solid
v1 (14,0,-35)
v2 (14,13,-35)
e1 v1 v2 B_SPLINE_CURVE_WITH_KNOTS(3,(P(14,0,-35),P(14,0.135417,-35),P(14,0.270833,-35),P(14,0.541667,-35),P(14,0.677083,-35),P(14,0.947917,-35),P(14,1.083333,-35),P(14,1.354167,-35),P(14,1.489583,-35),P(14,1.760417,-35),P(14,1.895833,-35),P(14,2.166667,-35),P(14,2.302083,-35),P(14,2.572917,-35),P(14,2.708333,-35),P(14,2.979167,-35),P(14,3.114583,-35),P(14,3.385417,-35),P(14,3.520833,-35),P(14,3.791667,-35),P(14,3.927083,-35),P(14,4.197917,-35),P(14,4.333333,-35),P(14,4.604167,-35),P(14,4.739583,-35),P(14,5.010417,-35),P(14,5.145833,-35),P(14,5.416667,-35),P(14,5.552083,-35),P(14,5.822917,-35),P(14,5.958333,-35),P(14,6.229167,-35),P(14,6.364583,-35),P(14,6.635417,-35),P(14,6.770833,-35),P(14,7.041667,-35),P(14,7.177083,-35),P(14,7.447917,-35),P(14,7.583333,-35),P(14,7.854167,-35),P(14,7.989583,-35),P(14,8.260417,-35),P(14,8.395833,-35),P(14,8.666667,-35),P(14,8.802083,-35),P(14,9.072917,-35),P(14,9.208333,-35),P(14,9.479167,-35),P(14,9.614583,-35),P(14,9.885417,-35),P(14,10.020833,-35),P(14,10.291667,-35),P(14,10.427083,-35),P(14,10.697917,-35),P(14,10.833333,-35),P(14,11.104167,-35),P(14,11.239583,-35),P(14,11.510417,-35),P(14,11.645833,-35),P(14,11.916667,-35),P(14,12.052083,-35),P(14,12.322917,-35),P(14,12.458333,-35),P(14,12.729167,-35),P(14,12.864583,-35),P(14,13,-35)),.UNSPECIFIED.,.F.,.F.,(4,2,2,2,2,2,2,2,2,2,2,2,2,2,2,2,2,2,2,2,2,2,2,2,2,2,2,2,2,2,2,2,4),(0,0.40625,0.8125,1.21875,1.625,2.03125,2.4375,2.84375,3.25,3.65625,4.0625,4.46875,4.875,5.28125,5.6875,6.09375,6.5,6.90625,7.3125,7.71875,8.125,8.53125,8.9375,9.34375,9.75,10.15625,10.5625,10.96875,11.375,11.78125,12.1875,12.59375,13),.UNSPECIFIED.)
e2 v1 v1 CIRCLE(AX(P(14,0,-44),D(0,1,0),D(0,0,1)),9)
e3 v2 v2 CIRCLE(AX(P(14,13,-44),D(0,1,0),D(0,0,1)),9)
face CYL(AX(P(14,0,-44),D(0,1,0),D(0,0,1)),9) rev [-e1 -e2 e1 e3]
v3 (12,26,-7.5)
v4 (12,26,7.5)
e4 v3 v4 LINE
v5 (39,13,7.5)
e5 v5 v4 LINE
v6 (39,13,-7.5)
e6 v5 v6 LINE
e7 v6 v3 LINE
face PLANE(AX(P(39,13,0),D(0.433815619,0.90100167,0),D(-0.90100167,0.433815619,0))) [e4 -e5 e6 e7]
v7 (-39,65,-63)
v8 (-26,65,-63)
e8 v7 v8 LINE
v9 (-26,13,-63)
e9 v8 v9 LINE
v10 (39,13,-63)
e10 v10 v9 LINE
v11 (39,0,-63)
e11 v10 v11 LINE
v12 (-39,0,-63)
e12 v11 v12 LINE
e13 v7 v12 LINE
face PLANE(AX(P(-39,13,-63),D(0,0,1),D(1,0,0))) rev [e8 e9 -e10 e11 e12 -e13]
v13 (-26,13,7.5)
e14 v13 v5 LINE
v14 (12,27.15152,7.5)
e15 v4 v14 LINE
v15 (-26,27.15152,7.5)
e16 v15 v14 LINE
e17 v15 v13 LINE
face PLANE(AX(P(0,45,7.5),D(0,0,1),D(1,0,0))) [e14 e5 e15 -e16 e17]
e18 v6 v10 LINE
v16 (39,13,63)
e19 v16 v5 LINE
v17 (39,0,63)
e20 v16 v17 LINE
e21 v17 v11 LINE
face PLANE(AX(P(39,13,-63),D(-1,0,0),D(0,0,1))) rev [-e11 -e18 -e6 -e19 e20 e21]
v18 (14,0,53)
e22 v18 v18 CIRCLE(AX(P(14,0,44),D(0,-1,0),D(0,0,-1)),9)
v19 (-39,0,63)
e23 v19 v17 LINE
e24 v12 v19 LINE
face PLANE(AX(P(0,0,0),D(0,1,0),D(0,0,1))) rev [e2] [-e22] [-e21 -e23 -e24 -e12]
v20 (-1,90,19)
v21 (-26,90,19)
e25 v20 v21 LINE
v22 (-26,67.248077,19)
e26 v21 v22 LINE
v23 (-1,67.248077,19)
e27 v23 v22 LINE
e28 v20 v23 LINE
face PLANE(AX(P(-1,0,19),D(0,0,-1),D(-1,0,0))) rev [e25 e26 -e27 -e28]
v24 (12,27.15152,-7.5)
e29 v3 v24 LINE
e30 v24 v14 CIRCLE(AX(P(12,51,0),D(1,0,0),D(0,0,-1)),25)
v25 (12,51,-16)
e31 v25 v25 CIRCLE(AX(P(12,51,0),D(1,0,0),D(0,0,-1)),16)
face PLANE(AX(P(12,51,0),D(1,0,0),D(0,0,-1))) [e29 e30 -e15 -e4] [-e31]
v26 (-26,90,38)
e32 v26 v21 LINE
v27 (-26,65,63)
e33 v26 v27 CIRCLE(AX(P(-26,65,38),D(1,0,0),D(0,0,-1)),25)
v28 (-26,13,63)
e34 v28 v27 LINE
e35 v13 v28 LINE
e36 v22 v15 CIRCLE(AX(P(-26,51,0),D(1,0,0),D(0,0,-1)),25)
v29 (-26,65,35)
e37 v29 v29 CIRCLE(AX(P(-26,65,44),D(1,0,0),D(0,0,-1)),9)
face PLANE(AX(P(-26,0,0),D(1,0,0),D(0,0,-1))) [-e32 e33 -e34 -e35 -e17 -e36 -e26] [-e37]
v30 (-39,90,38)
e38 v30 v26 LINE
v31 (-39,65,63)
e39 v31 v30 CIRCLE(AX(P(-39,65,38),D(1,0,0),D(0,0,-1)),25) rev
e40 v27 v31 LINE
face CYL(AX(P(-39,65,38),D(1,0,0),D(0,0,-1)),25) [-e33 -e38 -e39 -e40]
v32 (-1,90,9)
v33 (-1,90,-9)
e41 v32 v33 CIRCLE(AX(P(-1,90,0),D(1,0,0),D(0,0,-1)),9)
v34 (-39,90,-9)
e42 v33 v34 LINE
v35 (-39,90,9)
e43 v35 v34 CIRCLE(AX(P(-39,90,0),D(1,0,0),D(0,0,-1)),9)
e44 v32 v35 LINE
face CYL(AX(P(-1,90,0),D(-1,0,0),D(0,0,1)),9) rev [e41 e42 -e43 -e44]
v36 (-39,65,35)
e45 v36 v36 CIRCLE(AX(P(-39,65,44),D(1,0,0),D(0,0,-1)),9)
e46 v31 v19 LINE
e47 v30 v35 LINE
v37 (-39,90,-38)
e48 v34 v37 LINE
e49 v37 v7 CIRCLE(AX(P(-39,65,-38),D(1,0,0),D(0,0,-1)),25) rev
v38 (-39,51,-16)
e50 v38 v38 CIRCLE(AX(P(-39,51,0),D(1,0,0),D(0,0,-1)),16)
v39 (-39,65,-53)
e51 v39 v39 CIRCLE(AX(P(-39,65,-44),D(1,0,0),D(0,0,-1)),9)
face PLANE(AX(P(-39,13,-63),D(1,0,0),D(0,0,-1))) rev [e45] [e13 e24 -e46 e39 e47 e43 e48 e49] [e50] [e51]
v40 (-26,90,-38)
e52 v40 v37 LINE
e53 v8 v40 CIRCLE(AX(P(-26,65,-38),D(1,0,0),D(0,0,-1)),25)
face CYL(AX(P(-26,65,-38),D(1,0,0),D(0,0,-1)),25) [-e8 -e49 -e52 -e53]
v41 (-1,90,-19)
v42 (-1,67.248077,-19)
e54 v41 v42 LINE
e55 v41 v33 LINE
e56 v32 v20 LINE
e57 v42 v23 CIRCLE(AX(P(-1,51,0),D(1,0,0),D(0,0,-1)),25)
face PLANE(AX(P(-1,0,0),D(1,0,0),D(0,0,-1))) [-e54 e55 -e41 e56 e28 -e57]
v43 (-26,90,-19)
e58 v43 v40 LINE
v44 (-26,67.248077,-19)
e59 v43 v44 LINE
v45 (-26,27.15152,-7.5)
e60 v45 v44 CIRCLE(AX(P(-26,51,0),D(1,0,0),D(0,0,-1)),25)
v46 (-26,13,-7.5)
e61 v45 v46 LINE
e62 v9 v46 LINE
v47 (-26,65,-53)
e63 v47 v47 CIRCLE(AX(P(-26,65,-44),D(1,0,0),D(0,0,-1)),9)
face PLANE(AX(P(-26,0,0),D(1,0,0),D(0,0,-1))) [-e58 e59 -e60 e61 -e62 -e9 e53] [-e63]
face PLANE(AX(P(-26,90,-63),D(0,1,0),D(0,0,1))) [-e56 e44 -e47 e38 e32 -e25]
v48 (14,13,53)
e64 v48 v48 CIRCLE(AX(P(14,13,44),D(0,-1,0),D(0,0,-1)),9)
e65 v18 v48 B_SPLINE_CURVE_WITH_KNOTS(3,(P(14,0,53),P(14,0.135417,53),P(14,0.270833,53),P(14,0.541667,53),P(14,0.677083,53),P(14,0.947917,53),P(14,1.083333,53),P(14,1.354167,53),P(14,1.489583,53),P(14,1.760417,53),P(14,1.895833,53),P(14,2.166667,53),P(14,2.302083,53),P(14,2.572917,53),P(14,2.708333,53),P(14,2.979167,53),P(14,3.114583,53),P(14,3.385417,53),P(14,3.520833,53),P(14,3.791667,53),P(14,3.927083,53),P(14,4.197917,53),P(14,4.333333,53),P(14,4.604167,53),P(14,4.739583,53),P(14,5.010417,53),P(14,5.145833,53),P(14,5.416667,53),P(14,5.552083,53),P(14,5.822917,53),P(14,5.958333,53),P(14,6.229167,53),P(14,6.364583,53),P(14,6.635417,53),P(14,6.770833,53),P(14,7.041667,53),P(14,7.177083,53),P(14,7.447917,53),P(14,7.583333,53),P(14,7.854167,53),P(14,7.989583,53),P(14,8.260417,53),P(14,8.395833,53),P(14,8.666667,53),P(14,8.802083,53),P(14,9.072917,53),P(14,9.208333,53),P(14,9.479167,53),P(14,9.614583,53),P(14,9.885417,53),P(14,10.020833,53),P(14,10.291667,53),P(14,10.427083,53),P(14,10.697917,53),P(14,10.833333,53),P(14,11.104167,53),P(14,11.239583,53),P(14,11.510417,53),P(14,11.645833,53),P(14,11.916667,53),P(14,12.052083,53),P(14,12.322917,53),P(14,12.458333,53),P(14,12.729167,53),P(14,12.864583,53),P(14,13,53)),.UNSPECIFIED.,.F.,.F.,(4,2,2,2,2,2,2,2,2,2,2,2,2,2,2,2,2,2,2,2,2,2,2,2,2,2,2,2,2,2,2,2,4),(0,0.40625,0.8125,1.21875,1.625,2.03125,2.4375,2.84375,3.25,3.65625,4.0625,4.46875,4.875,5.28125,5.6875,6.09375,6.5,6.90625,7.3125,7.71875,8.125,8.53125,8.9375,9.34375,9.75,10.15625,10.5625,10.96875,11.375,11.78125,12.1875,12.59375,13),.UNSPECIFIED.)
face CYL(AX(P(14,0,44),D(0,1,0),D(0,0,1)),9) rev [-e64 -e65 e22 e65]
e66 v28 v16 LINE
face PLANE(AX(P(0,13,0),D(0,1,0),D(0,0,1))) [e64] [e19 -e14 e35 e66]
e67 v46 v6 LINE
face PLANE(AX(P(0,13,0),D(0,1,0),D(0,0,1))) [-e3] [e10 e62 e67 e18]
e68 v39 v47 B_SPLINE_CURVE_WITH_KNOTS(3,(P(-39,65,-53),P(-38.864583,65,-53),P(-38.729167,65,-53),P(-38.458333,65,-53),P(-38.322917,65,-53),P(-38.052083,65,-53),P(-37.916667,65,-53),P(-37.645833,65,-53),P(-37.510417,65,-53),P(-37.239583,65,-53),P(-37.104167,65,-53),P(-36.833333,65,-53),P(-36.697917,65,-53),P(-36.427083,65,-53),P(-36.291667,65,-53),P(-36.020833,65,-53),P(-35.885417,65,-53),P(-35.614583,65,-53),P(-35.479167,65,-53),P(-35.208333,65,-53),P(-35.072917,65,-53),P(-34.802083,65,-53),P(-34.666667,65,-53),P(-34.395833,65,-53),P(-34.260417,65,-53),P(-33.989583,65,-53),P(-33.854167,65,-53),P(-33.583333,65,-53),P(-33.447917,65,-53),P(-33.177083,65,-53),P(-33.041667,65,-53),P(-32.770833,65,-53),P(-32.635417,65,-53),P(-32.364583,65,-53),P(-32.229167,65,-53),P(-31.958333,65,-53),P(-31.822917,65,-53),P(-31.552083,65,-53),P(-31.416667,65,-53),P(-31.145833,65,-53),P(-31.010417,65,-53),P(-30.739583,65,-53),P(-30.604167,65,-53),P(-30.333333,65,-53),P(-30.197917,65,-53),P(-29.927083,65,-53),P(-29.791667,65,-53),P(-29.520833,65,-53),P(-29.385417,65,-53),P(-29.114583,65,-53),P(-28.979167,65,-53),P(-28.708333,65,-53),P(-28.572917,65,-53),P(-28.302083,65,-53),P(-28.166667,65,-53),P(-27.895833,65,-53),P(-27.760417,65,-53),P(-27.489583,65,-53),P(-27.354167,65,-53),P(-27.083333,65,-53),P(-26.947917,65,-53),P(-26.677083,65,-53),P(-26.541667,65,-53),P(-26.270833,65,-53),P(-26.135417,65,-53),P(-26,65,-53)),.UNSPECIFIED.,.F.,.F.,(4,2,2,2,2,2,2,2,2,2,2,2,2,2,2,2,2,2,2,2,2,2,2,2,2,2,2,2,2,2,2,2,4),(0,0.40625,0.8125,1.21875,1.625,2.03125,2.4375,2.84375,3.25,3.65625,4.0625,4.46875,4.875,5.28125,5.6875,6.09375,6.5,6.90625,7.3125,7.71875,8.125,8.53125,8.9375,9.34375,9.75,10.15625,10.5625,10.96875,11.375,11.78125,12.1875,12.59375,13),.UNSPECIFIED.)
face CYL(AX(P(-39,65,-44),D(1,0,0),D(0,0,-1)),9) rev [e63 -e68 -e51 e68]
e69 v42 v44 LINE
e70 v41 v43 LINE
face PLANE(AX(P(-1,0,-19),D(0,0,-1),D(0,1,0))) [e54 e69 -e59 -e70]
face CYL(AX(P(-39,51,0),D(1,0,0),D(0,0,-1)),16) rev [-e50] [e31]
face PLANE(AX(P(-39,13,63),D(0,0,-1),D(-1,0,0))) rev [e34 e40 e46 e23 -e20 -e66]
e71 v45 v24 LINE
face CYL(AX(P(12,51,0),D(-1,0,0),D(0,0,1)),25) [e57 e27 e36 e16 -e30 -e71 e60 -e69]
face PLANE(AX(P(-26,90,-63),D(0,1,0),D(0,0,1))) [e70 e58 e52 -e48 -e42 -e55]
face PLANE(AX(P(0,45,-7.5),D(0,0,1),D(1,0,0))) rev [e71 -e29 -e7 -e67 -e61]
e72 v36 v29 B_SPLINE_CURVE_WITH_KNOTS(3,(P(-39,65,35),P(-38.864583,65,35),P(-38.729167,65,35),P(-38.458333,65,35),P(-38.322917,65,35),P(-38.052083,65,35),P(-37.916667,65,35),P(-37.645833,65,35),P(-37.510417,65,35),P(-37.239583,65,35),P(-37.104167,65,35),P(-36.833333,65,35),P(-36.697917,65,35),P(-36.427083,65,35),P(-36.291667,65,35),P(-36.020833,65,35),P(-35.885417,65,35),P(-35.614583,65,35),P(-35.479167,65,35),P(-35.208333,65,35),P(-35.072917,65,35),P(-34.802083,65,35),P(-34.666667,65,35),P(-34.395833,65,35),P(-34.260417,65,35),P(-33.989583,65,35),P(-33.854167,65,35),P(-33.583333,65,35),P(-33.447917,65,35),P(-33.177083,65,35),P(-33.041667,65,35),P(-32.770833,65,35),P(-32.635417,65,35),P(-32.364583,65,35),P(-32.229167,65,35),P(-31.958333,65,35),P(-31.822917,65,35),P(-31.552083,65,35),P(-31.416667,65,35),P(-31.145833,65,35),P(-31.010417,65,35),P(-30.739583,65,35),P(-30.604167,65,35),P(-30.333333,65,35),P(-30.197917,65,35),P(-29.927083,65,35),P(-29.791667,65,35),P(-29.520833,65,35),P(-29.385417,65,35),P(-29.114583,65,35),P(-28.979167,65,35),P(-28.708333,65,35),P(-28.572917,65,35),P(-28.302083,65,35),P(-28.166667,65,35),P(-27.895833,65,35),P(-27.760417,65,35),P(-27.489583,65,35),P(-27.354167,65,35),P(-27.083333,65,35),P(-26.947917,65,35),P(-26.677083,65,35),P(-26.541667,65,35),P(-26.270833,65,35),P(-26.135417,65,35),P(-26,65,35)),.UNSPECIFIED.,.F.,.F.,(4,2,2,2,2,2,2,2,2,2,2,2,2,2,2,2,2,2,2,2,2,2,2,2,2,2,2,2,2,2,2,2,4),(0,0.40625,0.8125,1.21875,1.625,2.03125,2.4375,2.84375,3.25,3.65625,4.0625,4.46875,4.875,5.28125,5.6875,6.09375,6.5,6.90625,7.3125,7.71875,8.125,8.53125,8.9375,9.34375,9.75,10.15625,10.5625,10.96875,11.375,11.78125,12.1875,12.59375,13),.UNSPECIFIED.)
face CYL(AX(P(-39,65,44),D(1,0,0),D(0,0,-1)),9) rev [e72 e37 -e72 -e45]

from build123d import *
from build123d.topology import SkipClean

# Parameters (mm, degrees)
SKETCH2_W               = 78
SKETCH2_H               = 126
BOSS_EXTRUDE1_DEPTH     = 13
SKETCH3_W               = 126
SKETCH3_H               = 77
BOSS_EXTRUDE2_DEPTH     = 13
FILLET1_R               = 25
SKETCH4_R               = 9
CUT_EXTRUDE1_DEPTH      = 128.647953372
SKETCH5_R               = 25
BOSS_EXTRUDE3_DEPTH     = 38
BOSS_EXTRUDE4_DEPTH     = 25
CUT_EXTRUDE3_DEPTH      = 128.647953372
CUT_EXTRUDE3_DEPTH_BACK = 128.647953372
SKETCH5_5_R             = 16
RIB1_START              = -7.5
RIB1_DEPTH              = 15
SKETCH7_R               = 9
CUT_EXTRUDE4_DEPTH      = 107.85972113


with BuildPart() as part:
    # Sketch2 → Boss-Extrude1 (new body)
    with BuildSketch(Plane(origin=(0, 0, 0), x_dir=(1, 0, 0), z_dir=(0, 1, 0))):
        Rectangle(SKETCH2_W, SKETCH2_H)
    extrude(amount=BOSS_EXTRUDE1_DEPTH)

    # Sketch3 → Boss-Extrude2 (add)
    with BuildSketch(Plane.ZY.offset(39)):
        with Locations((0, 51.5)):
            Rectangle(SKETCH3_W, SKETCH3_H)
    extrude(amount=-BOSS_EXTRUDE2_DEPTH)

    # Fillet1
    fillet1_edges = [part.edges().sort_by_distance(p)[0] for p in [
        (-32.5, 90, -63),
        (-32.5, 90, 63),
    ]]
    fillet(fillet1_edges, radius=FILLET1_R)

    # Sketch4 → Cut-Extrude1 (cut, through all)
    with BuildSketch(Plane(origin=(-26, 0, 0), x_dir=(0, 0, -1), z_dir=(1, 0, 0))):
        with Locations((-44, 65)):
            Circle(SKETCH4_R)
        with Locations((44, 65)):
            Circle(SKETCH4_R)
    extrude(amount=-CUT_EXTRUDE1_DEPTH, mode=Mode.SUBTRACT)

    # Sketch5 → Boss-Extrude3 (add)
    with BuildSketch(Plane(origin=(-26, 0, 0), x_dir=(0, 0, -1), z_dir=(1, 0, 0))):
        with Locations((0, 51)):
            Circle(SKETCH5_R)
    extrude(amount=BOSS_EXTRUDE3_DEPTH)

    # Sketch5<3> → Boss-Extrude4 (add)
    with BuildSketch(Plane(origin=(-26, 0, 0), x_dir=(0, 0, -1), z_dir=(1, 0, 0))):
        with BuildLine():
            Line((-9, 90), (-19, 90))
            Line((-19, 90), (-19, 67.248076809))
            ThreePointArc((-19, 67.248076809), (0, 76), (19, 67.248076809))
            Line((19, 67.248076809), (19, 90))
            Line((19, 90), (9, 90))
            ThreePointArc((9, 90), (0, 81), (-9, 90))
        make_face()
    extrude(amount=BOSS_EXTRUDE4_DEPTH)

    # Sketch5<5> → Cut-Extrude3 (cut, two sides: drawn at the far end of the back side and taken through both)
    with SkipClean():  # the faces are left unmerged after this step: merging them gives an invalid solid
        with BuildSketch(Plane(origin=(-26, 0, 0), x_dir=(0, 0, -1), z_dir=(1, 0, 0)).offset(-CUT_EXTRUDE3_DEPTH_BACK)):
            with Locations((0, 51)):
                Circle(SKETCH5_5_R)
            with BuildLine():
                Line((9, 90), (-9, 90))
                ThreePointArc((-9, 90), (0, 81), (9, 90))
            make_face()
        extrude(amount=CUT_EXTRUDE3_DEPTH + CUT_EXTRUDE3_DEPTH_BACK, mode=Mode.SUBTRACT)
    add(part.part.scale(1), mode=Mode.REPLACE)  # the faces are merged on a copy

    # Rib1: read off the stored shape, not the designer's step
    # Rib1 outline → Rib1 (add)
    with BuildSketch(Plane.XY.offset(RIB1_START)):
        Polygon((12, 26), (12, 27.151519965), (-26, 27.151519965), (-26, 13), (39, 13), align=None)
    extrude(amount=RIB1_DEPTH)

    # Sketch7 → Cut-Extrude4 (cut, symmetric)
    with BuildSketch(Plane(origin=(0, 13, 0), x_dir=(1, 0, 0), z_dir=(0, 1, 0))):
        with Locations(Location((14, 44, 0), (0, 0, 270))):
            Circle(SKETCH7_R)
    cut_extrude4 = extrude(amount=CUT_EXTRUDE4_DEPTH, both=True, mode=Mode.SUBTRACT)

    # Mirror1: Cut-Extrude4 across plane
    add(cut_extrude4.mirror(Plane.XY), mode=Mode.SUBTRACT)


solid = part.part
